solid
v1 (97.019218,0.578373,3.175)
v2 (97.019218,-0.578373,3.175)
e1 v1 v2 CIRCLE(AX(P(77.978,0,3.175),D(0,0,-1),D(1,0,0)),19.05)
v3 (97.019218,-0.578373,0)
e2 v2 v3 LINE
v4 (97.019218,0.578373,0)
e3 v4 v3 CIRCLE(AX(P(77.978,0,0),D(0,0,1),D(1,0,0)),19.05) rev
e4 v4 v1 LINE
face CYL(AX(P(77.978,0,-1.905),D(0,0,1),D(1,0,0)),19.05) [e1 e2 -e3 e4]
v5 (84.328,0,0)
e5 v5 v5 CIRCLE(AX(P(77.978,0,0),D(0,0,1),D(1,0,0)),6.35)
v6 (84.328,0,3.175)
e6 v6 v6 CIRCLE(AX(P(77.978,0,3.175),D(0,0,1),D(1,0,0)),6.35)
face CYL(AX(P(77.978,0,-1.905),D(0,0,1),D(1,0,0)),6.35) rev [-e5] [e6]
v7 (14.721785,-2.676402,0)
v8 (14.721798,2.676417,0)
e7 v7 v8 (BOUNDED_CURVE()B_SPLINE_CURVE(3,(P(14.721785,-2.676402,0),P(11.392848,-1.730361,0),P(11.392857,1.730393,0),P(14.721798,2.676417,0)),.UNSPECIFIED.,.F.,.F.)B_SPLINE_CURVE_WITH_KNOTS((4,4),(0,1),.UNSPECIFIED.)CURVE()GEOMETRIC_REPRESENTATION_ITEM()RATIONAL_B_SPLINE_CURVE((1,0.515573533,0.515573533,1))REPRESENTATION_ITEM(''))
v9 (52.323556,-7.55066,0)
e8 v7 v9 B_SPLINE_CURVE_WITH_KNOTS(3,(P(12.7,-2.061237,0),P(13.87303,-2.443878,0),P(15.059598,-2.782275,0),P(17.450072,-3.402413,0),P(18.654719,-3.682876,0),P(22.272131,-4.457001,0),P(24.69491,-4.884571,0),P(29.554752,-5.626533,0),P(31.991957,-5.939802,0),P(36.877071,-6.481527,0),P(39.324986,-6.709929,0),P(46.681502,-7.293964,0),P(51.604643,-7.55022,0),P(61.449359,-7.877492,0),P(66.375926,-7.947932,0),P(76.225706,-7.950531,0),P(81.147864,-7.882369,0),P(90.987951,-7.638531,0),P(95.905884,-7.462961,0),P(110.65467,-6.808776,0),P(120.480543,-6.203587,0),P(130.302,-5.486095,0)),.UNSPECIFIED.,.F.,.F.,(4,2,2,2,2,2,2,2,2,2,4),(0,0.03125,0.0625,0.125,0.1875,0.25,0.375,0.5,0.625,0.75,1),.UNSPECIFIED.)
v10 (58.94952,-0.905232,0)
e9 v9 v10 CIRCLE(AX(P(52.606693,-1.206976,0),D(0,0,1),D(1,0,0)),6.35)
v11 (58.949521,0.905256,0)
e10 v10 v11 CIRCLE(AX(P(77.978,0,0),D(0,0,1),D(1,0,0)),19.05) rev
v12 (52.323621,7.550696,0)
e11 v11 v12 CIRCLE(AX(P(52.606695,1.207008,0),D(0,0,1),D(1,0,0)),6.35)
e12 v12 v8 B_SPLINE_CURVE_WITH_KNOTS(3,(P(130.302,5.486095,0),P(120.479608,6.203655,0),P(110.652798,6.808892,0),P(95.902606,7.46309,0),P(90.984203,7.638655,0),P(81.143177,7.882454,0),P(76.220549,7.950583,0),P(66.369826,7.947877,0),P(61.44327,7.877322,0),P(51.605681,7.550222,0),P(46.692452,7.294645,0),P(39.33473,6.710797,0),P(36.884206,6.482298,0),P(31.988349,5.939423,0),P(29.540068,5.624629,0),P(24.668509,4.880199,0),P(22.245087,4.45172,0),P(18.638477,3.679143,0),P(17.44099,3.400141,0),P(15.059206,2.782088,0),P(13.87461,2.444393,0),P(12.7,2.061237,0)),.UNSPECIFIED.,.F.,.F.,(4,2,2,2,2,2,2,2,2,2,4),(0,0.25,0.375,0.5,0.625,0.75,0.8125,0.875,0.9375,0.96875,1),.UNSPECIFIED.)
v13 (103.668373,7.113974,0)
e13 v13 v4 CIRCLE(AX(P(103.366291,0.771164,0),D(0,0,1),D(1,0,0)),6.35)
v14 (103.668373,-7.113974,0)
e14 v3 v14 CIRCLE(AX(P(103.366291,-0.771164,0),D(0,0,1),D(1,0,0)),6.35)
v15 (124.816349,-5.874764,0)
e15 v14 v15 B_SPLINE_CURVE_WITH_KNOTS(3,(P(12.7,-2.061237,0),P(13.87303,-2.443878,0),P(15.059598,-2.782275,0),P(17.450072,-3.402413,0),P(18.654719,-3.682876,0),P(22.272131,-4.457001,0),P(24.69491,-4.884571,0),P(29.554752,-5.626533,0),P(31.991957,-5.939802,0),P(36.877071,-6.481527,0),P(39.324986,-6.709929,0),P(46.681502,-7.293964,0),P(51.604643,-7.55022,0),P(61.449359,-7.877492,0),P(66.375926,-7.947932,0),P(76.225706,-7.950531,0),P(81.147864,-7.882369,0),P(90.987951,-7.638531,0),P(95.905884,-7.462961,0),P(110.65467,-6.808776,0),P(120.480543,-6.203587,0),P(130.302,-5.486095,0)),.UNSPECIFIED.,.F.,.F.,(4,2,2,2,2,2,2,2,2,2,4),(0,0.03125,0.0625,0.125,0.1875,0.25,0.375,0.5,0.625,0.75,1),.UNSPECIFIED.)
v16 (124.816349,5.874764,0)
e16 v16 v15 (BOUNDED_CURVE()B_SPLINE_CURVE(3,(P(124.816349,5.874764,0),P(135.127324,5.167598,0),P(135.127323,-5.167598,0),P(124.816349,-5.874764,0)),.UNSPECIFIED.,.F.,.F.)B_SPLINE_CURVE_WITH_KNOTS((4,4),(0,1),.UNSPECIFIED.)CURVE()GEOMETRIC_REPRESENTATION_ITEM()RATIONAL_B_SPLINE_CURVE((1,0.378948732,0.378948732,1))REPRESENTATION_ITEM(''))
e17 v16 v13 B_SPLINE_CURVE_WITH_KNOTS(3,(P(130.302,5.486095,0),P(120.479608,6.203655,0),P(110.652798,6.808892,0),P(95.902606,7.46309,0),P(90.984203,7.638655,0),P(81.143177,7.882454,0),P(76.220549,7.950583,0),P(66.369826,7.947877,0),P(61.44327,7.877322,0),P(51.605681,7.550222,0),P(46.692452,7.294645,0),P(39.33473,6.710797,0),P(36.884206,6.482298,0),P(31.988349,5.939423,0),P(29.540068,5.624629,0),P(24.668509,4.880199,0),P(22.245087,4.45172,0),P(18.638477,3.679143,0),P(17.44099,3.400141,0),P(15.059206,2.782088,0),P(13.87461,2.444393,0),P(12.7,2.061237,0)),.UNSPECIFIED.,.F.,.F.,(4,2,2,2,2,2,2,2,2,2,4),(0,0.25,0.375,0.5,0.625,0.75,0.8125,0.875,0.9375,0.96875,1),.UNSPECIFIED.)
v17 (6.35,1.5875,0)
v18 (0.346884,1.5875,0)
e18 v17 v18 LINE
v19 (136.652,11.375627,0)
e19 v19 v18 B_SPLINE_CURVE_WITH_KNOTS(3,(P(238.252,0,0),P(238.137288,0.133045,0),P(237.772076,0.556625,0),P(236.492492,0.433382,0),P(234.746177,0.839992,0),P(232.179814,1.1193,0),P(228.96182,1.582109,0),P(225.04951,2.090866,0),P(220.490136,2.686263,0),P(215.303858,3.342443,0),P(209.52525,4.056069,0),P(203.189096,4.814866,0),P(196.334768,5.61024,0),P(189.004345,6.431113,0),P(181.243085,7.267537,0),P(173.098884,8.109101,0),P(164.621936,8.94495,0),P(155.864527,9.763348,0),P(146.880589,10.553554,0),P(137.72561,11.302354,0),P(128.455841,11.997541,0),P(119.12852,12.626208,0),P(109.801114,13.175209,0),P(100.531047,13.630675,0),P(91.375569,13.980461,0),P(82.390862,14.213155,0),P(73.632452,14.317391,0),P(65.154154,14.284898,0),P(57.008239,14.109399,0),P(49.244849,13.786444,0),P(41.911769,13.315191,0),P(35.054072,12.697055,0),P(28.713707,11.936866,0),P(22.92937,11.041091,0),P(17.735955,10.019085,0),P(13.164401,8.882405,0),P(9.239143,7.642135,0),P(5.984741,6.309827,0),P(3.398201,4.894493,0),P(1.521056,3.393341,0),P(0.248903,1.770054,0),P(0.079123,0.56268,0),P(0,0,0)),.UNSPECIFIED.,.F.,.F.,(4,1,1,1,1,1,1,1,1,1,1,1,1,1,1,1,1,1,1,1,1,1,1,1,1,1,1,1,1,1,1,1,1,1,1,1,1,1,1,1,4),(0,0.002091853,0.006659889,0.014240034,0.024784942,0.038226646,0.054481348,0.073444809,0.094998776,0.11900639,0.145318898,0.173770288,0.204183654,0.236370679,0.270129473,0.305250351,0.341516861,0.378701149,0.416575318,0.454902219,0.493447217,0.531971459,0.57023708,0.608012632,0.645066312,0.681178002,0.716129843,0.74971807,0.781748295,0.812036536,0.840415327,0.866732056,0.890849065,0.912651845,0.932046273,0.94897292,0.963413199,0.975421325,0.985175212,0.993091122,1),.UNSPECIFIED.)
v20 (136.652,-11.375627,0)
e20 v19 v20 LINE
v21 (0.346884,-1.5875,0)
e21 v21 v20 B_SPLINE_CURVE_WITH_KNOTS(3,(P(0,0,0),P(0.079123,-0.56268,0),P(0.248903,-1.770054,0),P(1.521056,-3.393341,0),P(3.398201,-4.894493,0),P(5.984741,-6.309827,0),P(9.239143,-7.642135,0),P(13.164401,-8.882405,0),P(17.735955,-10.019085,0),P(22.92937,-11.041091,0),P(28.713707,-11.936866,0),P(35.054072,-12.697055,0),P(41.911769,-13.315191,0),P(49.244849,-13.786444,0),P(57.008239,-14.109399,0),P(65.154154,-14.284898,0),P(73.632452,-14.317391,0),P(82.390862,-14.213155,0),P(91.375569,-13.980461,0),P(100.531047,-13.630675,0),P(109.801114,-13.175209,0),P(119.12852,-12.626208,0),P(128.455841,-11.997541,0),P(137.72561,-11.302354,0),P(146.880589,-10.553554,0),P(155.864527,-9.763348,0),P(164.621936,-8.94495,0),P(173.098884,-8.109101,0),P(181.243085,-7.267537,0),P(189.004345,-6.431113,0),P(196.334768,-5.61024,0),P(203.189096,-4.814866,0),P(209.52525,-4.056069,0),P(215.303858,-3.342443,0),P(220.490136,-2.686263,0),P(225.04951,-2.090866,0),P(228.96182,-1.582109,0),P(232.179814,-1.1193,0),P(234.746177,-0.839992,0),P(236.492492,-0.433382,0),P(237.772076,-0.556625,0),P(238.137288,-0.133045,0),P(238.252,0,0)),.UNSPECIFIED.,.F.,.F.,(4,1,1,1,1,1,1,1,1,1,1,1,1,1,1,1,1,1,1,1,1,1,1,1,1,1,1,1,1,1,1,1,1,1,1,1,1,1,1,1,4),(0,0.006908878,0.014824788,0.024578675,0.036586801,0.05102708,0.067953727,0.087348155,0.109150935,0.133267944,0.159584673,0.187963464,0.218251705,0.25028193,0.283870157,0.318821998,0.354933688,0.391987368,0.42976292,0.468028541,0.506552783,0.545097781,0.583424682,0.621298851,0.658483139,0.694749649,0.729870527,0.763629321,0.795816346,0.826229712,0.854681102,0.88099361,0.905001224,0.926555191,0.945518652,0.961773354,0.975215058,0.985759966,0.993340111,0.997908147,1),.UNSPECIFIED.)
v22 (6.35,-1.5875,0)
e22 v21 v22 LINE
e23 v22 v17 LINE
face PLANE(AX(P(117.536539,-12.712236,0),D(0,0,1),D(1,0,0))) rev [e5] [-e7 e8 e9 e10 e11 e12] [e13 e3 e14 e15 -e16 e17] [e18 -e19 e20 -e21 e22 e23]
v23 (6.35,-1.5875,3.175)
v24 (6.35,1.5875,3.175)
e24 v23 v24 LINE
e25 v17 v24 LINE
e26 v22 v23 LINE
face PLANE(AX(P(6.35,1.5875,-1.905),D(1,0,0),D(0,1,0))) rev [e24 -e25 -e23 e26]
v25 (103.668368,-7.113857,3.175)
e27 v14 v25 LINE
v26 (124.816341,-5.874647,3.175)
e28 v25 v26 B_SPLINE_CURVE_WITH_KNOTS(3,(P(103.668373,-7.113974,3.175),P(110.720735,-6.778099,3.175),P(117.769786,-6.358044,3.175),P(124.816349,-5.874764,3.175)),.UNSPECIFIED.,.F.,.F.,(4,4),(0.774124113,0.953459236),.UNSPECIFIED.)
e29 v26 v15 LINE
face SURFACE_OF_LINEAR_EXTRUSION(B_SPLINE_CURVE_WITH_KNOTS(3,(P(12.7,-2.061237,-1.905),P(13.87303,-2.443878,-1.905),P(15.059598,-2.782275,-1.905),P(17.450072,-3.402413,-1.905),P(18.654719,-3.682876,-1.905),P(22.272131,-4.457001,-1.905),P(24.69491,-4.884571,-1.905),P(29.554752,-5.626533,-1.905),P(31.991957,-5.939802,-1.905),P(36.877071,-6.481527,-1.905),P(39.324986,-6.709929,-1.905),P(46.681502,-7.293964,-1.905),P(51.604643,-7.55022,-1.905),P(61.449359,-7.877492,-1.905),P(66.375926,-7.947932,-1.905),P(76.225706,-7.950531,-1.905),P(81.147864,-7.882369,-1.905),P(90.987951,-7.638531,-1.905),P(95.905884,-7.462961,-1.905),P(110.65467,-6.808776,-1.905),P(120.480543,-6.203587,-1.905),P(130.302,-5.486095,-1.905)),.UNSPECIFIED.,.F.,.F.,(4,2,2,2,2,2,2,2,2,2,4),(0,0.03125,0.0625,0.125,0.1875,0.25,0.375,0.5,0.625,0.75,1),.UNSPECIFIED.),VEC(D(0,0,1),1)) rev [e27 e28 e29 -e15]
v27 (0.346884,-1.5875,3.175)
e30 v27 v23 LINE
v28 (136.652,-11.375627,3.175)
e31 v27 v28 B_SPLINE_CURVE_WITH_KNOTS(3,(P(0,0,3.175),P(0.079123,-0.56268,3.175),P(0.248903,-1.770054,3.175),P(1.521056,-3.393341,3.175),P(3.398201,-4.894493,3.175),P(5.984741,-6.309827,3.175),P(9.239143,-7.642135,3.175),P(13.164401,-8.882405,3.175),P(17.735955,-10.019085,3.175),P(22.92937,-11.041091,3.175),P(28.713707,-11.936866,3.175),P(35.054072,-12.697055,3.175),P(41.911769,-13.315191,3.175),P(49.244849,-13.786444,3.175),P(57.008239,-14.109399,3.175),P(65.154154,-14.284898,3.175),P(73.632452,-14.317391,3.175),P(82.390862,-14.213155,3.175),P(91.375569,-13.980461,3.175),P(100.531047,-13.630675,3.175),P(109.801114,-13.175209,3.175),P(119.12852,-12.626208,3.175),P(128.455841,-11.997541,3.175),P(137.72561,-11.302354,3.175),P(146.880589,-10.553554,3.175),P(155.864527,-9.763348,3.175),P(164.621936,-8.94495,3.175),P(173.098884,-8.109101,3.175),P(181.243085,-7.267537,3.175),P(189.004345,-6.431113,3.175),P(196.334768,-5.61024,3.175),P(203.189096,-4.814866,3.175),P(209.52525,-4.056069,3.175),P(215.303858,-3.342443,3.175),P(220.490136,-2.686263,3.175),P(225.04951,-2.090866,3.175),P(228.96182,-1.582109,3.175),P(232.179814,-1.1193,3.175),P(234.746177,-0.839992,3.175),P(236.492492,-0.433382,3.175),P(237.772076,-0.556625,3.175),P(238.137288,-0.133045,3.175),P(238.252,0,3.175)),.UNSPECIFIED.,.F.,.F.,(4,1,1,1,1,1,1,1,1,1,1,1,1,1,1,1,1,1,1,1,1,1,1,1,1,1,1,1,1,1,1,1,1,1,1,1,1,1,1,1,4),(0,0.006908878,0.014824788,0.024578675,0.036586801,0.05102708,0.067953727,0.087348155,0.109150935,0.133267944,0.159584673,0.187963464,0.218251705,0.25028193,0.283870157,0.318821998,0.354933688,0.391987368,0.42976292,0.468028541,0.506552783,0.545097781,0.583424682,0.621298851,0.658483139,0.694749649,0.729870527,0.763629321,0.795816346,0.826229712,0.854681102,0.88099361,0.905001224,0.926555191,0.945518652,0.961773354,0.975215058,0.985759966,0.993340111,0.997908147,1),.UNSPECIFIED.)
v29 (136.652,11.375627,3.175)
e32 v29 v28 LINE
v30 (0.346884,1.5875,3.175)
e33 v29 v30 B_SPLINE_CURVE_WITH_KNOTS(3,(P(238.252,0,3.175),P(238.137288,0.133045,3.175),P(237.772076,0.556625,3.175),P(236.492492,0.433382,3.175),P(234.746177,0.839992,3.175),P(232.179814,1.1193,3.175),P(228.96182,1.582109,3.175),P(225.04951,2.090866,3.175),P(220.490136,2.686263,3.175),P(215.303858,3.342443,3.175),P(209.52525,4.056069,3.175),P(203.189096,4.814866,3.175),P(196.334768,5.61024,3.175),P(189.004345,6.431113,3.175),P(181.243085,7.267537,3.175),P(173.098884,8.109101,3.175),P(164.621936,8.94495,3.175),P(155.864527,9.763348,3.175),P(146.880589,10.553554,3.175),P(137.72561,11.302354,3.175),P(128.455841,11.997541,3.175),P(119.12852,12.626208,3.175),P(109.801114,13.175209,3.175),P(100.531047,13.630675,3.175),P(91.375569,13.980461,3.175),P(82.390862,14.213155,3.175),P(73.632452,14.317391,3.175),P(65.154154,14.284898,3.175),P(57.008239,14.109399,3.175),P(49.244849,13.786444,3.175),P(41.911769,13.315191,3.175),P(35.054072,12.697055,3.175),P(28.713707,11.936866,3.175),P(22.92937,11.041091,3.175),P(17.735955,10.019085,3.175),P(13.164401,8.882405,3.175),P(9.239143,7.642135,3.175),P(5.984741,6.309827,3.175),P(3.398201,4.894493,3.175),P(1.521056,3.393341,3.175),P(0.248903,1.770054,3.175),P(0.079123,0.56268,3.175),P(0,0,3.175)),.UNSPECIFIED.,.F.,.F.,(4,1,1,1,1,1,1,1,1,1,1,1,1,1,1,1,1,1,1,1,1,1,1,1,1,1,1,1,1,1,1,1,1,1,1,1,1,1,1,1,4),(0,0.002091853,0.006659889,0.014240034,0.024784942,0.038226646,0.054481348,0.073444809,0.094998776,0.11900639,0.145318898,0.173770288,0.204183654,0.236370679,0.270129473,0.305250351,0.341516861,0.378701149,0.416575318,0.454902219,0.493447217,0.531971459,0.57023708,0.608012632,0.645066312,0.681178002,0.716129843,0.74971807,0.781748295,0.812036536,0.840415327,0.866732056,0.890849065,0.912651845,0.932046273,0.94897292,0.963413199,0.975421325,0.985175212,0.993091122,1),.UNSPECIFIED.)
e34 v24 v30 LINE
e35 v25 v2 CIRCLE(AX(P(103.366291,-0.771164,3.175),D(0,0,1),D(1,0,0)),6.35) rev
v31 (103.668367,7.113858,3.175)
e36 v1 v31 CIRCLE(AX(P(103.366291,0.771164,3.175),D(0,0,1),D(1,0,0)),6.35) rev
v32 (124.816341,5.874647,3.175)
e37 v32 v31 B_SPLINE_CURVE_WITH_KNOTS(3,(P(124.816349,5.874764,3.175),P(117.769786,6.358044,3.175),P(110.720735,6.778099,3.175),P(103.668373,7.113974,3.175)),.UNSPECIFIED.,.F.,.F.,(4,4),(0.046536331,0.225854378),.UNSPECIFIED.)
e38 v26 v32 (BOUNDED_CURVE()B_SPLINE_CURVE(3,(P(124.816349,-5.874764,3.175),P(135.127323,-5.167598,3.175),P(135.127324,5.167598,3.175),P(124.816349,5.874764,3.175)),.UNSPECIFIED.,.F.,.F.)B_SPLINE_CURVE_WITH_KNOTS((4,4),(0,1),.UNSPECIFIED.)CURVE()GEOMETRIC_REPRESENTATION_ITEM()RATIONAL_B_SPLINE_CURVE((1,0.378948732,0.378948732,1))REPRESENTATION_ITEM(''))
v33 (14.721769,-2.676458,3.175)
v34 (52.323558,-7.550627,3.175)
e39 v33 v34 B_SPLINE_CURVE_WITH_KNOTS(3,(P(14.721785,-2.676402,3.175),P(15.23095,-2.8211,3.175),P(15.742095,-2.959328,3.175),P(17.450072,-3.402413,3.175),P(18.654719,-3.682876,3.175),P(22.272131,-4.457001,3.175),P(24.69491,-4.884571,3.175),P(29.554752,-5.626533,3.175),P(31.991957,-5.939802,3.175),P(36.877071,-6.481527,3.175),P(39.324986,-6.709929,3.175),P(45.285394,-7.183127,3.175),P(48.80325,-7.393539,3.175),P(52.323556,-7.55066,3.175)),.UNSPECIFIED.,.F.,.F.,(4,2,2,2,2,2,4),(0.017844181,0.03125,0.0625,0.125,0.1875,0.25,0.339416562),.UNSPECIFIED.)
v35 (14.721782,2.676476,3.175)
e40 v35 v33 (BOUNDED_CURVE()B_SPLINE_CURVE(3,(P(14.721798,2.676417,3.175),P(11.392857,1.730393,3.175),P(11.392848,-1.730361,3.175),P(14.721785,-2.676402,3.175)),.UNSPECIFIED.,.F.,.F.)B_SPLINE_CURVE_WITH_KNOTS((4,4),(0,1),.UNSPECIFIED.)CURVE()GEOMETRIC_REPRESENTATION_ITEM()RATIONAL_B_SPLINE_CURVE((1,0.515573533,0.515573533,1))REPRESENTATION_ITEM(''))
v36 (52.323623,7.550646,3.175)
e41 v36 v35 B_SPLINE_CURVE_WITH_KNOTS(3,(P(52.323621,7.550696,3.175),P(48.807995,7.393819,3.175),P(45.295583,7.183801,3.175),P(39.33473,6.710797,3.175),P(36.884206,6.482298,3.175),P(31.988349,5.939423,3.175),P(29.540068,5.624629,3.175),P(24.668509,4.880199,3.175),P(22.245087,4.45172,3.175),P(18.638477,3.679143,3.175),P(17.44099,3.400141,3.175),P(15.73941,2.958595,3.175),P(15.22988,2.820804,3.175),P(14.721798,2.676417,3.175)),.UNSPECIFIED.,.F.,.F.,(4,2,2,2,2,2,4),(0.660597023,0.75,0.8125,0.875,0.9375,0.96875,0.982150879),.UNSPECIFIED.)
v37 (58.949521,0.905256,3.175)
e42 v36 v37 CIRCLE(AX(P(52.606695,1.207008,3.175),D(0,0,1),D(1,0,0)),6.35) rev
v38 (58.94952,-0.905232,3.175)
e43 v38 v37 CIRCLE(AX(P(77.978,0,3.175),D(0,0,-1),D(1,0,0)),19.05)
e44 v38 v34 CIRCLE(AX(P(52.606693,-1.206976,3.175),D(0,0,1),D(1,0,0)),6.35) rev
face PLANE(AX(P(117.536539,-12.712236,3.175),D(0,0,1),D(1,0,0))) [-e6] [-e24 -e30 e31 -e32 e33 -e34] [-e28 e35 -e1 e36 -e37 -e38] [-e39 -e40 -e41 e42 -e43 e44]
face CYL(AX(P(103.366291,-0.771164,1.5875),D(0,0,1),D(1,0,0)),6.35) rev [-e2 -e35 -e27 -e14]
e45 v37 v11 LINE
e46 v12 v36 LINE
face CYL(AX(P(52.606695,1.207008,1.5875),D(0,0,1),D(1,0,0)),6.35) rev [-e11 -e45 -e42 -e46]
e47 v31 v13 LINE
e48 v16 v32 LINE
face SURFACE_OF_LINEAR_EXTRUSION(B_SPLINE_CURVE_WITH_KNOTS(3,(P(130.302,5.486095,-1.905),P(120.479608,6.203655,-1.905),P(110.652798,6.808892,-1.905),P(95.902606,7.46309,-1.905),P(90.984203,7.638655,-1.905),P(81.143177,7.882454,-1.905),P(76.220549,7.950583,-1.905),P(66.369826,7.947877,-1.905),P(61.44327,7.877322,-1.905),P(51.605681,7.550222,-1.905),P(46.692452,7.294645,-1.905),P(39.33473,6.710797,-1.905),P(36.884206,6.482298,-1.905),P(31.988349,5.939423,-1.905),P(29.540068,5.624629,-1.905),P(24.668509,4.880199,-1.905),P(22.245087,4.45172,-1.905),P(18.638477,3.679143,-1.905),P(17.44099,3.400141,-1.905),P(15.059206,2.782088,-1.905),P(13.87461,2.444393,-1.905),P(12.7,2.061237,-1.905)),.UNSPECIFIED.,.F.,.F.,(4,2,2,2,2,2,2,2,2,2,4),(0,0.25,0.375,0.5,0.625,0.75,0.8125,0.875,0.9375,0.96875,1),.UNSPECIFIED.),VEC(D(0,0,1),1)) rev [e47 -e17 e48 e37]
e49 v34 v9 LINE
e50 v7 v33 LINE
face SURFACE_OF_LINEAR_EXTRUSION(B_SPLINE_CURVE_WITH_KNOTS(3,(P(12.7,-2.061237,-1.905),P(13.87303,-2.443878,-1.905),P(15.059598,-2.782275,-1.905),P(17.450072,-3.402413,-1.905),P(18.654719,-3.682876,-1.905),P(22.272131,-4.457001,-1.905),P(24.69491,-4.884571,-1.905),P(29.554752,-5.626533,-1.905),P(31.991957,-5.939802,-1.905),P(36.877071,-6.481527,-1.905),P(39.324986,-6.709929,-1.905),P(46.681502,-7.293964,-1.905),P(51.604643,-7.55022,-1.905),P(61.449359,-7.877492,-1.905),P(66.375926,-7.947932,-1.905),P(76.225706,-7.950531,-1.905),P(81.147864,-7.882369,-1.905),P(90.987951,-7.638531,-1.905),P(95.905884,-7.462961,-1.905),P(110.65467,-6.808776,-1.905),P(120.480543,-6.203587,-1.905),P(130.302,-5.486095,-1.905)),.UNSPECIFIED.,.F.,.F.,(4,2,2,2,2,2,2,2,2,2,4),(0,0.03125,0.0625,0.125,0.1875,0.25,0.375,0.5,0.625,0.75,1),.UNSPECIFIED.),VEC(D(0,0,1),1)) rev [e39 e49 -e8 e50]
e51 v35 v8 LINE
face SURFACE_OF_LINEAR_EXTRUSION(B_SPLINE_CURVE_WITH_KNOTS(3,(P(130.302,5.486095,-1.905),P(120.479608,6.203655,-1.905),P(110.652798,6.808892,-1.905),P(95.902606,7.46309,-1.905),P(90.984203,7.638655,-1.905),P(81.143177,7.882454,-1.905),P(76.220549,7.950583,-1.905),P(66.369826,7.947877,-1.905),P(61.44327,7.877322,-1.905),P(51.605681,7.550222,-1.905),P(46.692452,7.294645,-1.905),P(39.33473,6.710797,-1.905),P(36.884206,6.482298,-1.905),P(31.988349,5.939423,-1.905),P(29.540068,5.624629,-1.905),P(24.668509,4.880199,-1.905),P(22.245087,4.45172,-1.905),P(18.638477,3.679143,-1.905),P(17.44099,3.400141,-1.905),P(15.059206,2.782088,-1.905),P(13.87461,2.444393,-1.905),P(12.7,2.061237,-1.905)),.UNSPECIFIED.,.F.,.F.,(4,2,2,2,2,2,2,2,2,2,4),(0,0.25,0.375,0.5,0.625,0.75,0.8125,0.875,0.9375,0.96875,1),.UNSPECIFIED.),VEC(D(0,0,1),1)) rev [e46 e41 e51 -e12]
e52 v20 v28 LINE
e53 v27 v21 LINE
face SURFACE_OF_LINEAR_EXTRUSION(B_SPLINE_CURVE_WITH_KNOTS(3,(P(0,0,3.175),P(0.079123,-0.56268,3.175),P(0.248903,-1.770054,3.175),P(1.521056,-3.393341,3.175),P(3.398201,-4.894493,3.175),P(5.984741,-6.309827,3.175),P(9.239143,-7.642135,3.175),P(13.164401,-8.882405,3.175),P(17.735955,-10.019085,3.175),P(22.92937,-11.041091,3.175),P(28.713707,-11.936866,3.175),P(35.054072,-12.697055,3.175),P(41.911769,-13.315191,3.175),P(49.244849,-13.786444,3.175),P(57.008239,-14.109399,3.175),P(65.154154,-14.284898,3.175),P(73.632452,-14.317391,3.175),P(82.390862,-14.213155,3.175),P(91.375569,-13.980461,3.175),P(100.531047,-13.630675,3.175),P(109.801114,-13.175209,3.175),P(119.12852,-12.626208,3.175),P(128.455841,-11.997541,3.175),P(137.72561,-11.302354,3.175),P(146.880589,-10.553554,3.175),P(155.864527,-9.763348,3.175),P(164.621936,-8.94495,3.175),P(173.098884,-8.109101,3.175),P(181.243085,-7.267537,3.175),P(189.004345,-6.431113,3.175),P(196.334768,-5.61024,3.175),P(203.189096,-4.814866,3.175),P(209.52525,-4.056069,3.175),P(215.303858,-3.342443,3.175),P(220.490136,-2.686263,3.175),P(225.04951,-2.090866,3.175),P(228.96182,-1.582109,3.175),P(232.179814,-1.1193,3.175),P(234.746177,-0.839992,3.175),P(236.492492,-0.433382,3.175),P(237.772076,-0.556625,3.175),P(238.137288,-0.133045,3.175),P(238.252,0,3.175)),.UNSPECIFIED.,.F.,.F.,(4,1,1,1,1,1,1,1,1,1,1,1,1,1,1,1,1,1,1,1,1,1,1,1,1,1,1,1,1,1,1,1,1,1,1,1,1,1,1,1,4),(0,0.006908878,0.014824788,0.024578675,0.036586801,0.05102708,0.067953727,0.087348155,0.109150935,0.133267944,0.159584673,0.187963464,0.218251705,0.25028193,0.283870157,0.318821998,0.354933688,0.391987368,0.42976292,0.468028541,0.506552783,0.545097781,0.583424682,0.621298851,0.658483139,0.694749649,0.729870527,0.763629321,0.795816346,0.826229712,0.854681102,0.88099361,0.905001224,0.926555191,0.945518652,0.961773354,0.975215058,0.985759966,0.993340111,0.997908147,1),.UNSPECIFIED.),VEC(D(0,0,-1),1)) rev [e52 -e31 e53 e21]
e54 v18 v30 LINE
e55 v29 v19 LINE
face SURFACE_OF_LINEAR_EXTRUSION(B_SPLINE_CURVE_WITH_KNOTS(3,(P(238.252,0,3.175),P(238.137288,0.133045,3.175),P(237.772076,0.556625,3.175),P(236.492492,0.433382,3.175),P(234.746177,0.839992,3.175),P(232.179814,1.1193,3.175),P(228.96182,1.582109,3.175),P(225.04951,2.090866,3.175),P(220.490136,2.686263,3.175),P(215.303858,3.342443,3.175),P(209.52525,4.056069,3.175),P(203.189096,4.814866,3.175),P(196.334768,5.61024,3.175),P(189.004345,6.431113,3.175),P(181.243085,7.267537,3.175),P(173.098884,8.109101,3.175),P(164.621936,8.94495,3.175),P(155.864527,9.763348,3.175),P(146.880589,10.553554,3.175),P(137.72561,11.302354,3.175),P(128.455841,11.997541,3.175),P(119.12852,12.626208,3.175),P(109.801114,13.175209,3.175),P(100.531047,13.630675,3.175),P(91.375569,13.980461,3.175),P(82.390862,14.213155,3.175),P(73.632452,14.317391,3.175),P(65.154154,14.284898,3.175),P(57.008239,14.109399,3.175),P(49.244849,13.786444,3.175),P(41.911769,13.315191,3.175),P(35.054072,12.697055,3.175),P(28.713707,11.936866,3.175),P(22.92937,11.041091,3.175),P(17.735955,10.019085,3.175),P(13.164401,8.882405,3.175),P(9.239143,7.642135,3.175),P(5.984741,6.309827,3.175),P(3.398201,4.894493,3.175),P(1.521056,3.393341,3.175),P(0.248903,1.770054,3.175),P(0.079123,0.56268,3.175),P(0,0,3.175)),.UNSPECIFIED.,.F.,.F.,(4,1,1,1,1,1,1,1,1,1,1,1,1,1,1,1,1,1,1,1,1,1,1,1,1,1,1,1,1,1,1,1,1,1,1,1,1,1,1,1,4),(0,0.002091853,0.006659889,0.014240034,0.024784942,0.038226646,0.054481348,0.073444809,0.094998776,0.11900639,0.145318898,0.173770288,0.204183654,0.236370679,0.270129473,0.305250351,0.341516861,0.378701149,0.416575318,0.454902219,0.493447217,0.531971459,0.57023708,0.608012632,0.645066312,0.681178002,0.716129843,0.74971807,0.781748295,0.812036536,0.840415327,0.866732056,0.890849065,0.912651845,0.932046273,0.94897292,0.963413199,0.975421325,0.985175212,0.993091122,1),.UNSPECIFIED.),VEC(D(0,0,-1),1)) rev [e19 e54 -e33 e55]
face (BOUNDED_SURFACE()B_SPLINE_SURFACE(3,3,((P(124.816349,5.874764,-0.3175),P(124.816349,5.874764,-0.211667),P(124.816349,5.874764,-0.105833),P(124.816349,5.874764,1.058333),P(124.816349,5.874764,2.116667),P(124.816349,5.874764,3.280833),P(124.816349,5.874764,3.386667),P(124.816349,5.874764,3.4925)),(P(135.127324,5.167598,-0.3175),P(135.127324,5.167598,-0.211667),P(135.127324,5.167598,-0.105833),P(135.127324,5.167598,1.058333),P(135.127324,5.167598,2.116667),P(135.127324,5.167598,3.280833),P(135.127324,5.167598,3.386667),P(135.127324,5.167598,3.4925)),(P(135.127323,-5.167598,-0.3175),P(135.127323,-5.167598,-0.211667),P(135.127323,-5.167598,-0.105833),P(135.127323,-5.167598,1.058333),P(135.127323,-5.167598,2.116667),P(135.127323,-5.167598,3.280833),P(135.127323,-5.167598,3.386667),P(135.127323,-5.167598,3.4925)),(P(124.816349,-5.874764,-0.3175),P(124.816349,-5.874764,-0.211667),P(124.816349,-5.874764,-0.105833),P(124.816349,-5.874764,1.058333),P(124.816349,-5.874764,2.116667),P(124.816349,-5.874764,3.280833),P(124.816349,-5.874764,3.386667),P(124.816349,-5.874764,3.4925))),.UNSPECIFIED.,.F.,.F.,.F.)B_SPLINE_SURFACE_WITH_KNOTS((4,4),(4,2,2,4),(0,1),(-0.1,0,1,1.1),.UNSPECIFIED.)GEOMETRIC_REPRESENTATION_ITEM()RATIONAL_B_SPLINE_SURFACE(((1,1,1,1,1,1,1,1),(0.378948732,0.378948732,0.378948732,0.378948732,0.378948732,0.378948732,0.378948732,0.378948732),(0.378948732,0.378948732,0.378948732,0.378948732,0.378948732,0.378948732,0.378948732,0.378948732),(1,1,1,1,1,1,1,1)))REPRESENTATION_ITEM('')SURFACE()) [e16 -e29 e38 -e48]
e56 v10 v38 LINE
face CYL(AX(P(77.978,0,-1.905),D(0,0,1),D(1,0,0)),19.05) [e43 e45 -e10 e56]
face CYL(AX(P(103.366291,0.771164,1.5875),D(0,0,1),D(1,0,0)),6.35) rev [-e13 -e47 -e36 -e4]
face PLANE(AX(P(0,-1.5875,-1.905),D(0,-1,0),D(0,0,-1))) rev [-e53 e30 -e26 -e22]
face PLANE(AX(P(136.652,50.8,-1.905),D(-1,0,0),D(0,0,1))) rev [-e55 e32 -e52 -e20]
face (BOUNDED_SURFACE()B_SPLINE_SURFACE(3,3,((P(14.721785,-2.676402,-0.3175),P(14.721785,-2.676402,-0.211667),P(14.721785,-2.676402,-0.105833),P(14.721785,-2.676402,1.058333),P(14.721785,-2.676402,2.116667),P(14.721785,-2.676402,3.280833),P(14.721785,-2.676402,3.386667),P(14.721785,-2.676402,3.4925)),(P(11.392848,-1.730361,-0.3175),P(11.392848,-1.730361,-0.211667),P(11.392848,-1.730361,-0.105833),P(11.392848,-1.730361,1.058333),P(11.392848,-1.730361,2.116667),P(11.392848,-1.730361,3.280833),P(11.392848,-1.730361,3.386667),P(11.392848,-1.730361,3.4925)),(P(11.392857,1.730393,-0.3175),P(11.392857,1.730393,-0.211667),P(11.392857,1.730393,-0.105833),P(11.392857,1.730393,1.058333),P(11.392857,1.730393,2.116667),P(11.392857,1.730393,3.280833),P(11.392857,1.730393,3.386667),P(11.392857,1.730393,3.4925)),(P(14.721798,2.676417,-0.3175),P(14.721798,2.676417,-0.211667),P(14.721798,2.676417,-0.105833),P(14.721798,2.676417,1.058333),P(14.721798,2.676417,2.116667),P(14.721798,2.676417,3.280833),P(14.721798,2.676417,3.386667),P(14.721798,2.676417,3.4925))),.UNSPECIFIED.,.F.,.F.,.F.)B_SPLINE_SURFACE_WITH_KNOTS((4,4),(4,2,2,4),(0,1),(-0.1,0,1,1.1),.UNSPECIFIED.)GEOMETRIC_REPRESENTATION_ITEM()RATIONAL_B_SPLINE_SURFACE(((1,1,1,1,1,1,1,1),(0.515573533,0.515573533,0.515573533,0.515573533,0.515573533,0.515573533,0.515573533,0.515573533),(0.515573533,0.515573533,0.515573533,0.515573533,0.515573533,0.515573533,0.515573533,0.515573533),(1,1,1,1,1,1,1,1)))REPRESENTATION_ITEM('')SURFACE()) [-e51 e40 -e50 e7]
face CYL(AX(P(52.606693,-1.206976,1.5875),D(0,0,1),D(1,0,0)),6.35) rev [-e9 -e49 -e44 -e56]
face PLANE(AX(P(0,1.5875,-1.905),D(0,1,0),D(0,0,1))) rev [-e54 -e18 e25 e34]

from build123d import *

# Parameters (mm, degrees)
BOSS_EXTRUDE1_DEPTH = 3.175
SKETCH3_R           = 6.35
SKETCH3_W           = 101.6
SKETCH3_H           = 101.6
SKETCH3_W_2         = 6.35
SKETCH3_H_2         = 3.175
CUT_EXTRUDE1_DEPTH  = 5.08
CUT_EXTRUDE2_DEPTH  = 5.08
FILLET1_R           = 6.35
FILLET2_DEPTH       = 3.175
FILLET3_DEPTH       = 3.175


with BuildPart() as part:
    # Sketch2 → Boss-Extrude1 (new body)
    with BuildSketch(Plane.XY):
        with BuildLine():
            add(Edge.make_bspline(
                [(238.252, 0), (238.137287952, 0.133045201), (237.77207605, 0.556624867), (236.492491596, 0.433381797), (234.746176517, 0.839991501), (232.179813549, 1.11930028), (228.961819586, 1.582109184), (225.049510149, 2.090865972), (220.490135834, 2.68626254), (215.303857957, 3.3424435), (209.525250222, 4.056068786), (203.189096271, 4.814866496), (196.334767874, 5.610240284), (189.004344512, 6.431112947), (181.243085157, 7.267536628), (173.098884015, 8.109100956), (164.621936298, 8.944949754), (155.864527368, 9.763348396), (146.880589413, 10.553553512), (137.725609535, 11.302354143), (128.455841103, 11.997541105), (119.128519532, 12.626207685), (109.801114172, 13.175209012), (100.531046651, 13.630675258), (91.37556861, 13.980460991), (82.390862495, 14.213154889), (73.632451948, 14.3173913), (65.154153809, 14.284897979), (57.008238889, 14.109398576), (49.244849388, 13.786444375), (41.91176916, 13.315190578), (35.054071993, 12.697055156), (28.713707328, 11.936865774), (22.929370487, 11.041090517), (17.735955293, 10.019084993), (13.164400922, 8.882405292), (9.239142537, 7.642135457), (5.984741248, 6.30982688), (3.398200889, 4.894493254), (1.521056143, 3.393341148), (0.248902593, 1.770054281), (0.079123223, 0.562679551), (0, 0)],
                knots=[0, 0, 0, 0, 0.002091853, 0.006659889, 0.014240034, 0.024784942, 0.038226646, 0.054481348, 0.073444809, 0.094998776, 0.11900639, 0.145318898, 0.173770288, 0.204183654, 0.236370679, 0.270129473, 0.305250351, 0.341516861, 0.378701149, 0.416575318, 0.454902219, 0.493447217, 0.531971459, 0.57023708, 0.608012632, 0.645066312, 0.681178002, 0.716129843, 0.74971807, 0.781748295, 0.812036536, 0.840415327, 0.866732056, 0.890849065, 0.912651845, 0.932046273, 0.94897292, 0.963413199, 0.975421325, 0.985175212, 0.993091122, 1, 1, 1, 1], degree=3))
            add(Edge.make_bspline(
                [(238.252, 0), (238.137287952, -0.133045201), (237.77207605, -0.556624867), (236.492491596, -0.433381797), (234.746176517, -0.839991501), (232.179813549, -1.11930028), (228.961819586, -1.582109184), (225.049510149, -2.090865972), (220.490135834, -2.68626254), (215.303857957, -3.3424435), (209.525250222, -4.056068786), (203.189096271, -4.814866496), (196.334767874, -5.610240284), (189.004344512, -6.431112947), (181.243085157, -7.267536628), (173.098884015, -8.109100956), (164.621936298, -8.944949754), (155.864527368, -9.763348396), (146.880589413, -10.553553512), (137.725609535, -11.302354143), (128.455841103, -11.997541105), (119.128519532, -12.626207685), (109.801114172, -13.175209012), (100.531046651, -13.630675258), (91.37556861, -13.980460991), (82.390862495, -14.213154889), (73.632451948, -14.3173913), (65.154153809, -14.284897979), (57.008238889, -14.109398576), (49.244849388, -13.786444375), (41.91176916, -13.315190578), (35.054071993, -12.697055156), (28.713707328, -11.936865774), (22.929370487, -11.041090517), (17.735955293, -10.019084993), (13.164400922, -8.882405292), (9.239142537, -7.642135457), (5.984741248, -6.30982688), (3.398200889, -4.894493254), (1.521056143, -3.393341148), (0.248902593, -1.770054281), (0.079123223, -0.562679551), (0, 0)],
                knots=[0, 0, 0, 0, 0.002091853, 0.006659889, 0.014240034, 0.024784942, 0.038226646, 0.054481348, 0.073444809, 0.094998776, 0.11900639, 0.145318898, 0.173770288, 0.204183654, 0.236370679, 0.270129473, 0.305250351, 0.341516861, 0.378701149, 0.416575318, 0.454902219, 0.493447217, 0.531971459, 0.57023708, 0.608012632, 0.645066312, 0.681178002, 0.716129843, 0.74971807, 0.781748295, 0.812036536, 0.840415327, 0.866732056, 0.890849065, 0.912651845, 0.932046273, 0.94897292, 0.963413199, 0.975421325, 0.985175212, 0.993091122, 1, 1, 1, 1], degree=3))
        make_face()
    extrude(amount=BOSS_EXTRUDE1_DEPTH)

    # Sketch3 → Cut-Extrude1 (cut)
    with BuildSketch(Plane.XY.offset(3.175)):
        with Locations((77.978, 0)):
            Circle(SKETCH3_R)
        with Locations((187.452, 0)):
            Rectangle(SKETCH3_W, SKETCH3_H)
        with Locations((3.175, 0)):
            Rectangle(SKETCH3_W_2, SKETCH3_H_2)
    extrude(amount=-CUT_EXTRUDE1_DEPTH, mode=Mode.SUBTRACT)

    # Sketch4 → Cut-Extrude2 (cut)
    with BuildSketch(Plane.XY.offset(3.175)):
        with BuildLine():
            Line((12.7, 2.061236545), (12.7, -2.061236545))
            add(Edge.make_bspline(
                [(12.7, -2.061236545), (13.87302955, -2.443877536), (15.059598103, -2.782274606), (17.45007242, -3.402412701), (18.654719046, -3.682875551), (22.272131196, -4.457000706), (24.694910319, -4.884570871), (29.554752497, -5.626532885), (31.991957197, -5.93980242), (36.877070752, -6.481527427), (39.324986389, -6.70992917), (46.681501726, -7.293964145), (51.604643093, -7.550220084), (57.888045432, -7.759101786), (59.249411697, -7.797222339), (60.610975339, -7.828726233)],
                knots=[0, 0, 0, 0, 0.03125, 0.03125, 0.0625, 0.0625, 0.125, 0.125, 0.1875, 0.1875, 0.25, 0.25, 0.375, 0.375, 0.409562817, 0.409562817, 0.409562817, 0.409562817], degree=3))
            ThreePointArc((60.610975339, -7.828726233), (58.928, -2.977e-06), (60.610972892, 7.828720805))
            add(Edge.make_bspline(
                [(60.610972892, 7.828720805), (59.248339009, 7.797194353), (57.886109917, 7.759046352), (51.605681243, 7.550222376), (46.692451729, 7.294644767), (39.334730429, 6.710796809), (36.884205555, 6.482297599), (31.98834866, 5.939423271), (29.540067539, 5.624629017), (24.668508937, 4.880199139), (22.245087233, 4.451720456), (18.638476615, 3.679142949), (17.440989968, 3.400141258), (15.059205889, 2.782087789), (13.874610371, 2.444393198), (12.7, 2.061236545)],
                knots=[0.590397153, 0.590397153, 0.590397153, 0.590397153, 0.625, 0.625, 0.75, 0.75, 0.8125, 0.8125, 0.875, 0.875, 0.9375, 0.9375, 0.96875, 0.96875, 1, 1, 1, 1], degree=3))
        make_face()
        with BuildLine():
            Line((130.302, -5.486095107), (130.302, 5.486095107))
            add(Edge.make_bspline(
                [(130.302, 5.486095107), (120.479608061, 6.203654851), (110.65279807, 6.808891522), (99.048125108, 7.323580363), (97.276696647, 7.396621304), (95.50503071, 7.463624756)],
                knots=[0, 0, 0, 0, 0.25, 0.25, 0.295030215, 0.295030215, 0.295030215, 0.295030215], degree=3))
            ThreePointArc((95.50503071, 7.463624756), (97.028, 8e-09), (95.505030716, -7.463624741))
            add(Edge.make_bspline(
                [(95.505030716, -7.463624741), (97.277633364, -7.3965859), (99.049998284, -7.323503172), (110.654669728, -6.808775817), (120.480543478, -6.203586515), (130.302, -5.486095107)],
                knots=[0.704941686, 0.704941686, 0.704941686, 0.704941686, 0.75, 0.75, 1, 1, 1, 1], degree=3))
        make_face()
    extrude(amount=-CUT_EXTRUDE2_DEPTH, mode=Mode.SUBTRACT)

    # Fillet1
    fillet1_edges = [part.edges().sort_by_distance(p)[0] for p in [
        (95.505030716, -7.463624741, 1.5875),
        (95.50503071, 7.463624756, 1.5875),
        (60.610975339, -7.828726233, 1.5875),
        (60.610972892, 7.828720805, 1.5875),
    ]]
    fillet(fillet1_edges, radius=FILLET1_R)

    # Fillet2: read off the stored shape, not the designer's step
    # Fillet2 outline → Fillet2 (add)
    with BuildSketch(Plane.XY):
        with BuildLine():
            add(Edge.make_bspline(
                [(12.7, -2.061236545), (13.369816068, -2.279729834), (14.044046619, -2.483797093), (14.721784869, -2.67640159)],
                knots=[0, 0, 0, 0, 0.017844181, 0.017844181, 0.017844181, 0.017844181], degree=3))
            add(Edge.make_bspline(
                [(14.721784869, -2.67640159), (13.589337149, -2.354574507), (12.699999989, -1.401222797), (12.7, 5.587e-06)],
                knots=[0, 0, 0, 0, 0.499999161, 0.499999161, 0.499999161, 0.499999161], degree=3, weights=[1, 0.757787173, 0.636680556, 0.63668015]))
            Line((12.7, 5.587e-06), (12.7, -2.061236545))
        make_face()
        with BuildLine():
            Line((12.7, 2.061236545), (12.7, 5.587e-06))
            add(Edge.make_bspline(
                [(12.7, 5.587e-06), (12.700000011, 1.401240459), (13.589344107, 2.354593836), (14.72179848, 2.676416587)],
                knots=[0.499999161, 0.499999161, 0.499999161, 0.499999161, 1, 1, 1, 1], degree=3, weights=[0.63668015, 0.636679744, 0.75778636, 1]))
            add(Edge.make_bspline(
                [(14.72179848, 2.676416587), (14.045066341, 2.484101731), (13.370904406, 2.280084849), (12.7, 2.061236545)],
                knots=[0.982150879, 0.982150879, 0.982150879, 0.982150879, 1, 1, 1, 1], degree=3))
        make_face()
    extrude(amount=FILLET2_DEPTH)

    # Fillet3: read off the stored shape, not the designer's step
    # Fillet3 outline → Fillet3 (add)
    with BuildSketch(Plane.XY):
        with BuildLine():
            add(Edge.make_bspline(
                [(130.302, 5.486095107), (128.473607675, 5.619665498), (126.645062264, 5.749343885), (124.816349362, 5.874764032)],
                knots=[0, 0, 0, 0, 0.046536331, 0.046536331, 0.046536331, 0.046536331], degree=3))
            add(Edge.make_bspline(
                [(124.816349362, 5.874764032), (127.6499069, 5.680427784), (130.302000005, 3.665691382), (130.302, 1e-08)],
                knots=[0, 0, 0, 0, 0.499999999, 0.499999999, 0.499999999, 0.499999999], degree=3, weights=[1, 0.689474367, 0.534211549, 0.534211549]))
            Line((130.302, 1e-08), (130.302, 5.486095107))
        make_face()
        with BuildLine():
            Line((130.302, -5.486095107), (130.302, 1e-08))
            add(Edge.make_bspline(
                [(130.302, 1e-08), (130.301999995, -3.665691389), (127.649906854, -5.680427785), (124.816349294, -5.874764)],
                knots=[0.499999999, 0.499999999, 0.499999999, 0.499999999, 1, 1, 1, 1], degree=3, weights=[0.534211549, 0.534211548, 0.689474365, 1]))
            add(Edge.make_bspline(
                [(124.816349294, -5.874764), (126.645062219, -5.749343873), (128.473607653, -5.619665499), (130.302, -5.486095107)],
                knots=[0.953459236, 0.953459236, 0.953459236, 0.953459236, 1, 1, 1, 1], degree=3))
        make_face()
    extrude(amount=FILLET3_DEPTH)


solid = part.part
